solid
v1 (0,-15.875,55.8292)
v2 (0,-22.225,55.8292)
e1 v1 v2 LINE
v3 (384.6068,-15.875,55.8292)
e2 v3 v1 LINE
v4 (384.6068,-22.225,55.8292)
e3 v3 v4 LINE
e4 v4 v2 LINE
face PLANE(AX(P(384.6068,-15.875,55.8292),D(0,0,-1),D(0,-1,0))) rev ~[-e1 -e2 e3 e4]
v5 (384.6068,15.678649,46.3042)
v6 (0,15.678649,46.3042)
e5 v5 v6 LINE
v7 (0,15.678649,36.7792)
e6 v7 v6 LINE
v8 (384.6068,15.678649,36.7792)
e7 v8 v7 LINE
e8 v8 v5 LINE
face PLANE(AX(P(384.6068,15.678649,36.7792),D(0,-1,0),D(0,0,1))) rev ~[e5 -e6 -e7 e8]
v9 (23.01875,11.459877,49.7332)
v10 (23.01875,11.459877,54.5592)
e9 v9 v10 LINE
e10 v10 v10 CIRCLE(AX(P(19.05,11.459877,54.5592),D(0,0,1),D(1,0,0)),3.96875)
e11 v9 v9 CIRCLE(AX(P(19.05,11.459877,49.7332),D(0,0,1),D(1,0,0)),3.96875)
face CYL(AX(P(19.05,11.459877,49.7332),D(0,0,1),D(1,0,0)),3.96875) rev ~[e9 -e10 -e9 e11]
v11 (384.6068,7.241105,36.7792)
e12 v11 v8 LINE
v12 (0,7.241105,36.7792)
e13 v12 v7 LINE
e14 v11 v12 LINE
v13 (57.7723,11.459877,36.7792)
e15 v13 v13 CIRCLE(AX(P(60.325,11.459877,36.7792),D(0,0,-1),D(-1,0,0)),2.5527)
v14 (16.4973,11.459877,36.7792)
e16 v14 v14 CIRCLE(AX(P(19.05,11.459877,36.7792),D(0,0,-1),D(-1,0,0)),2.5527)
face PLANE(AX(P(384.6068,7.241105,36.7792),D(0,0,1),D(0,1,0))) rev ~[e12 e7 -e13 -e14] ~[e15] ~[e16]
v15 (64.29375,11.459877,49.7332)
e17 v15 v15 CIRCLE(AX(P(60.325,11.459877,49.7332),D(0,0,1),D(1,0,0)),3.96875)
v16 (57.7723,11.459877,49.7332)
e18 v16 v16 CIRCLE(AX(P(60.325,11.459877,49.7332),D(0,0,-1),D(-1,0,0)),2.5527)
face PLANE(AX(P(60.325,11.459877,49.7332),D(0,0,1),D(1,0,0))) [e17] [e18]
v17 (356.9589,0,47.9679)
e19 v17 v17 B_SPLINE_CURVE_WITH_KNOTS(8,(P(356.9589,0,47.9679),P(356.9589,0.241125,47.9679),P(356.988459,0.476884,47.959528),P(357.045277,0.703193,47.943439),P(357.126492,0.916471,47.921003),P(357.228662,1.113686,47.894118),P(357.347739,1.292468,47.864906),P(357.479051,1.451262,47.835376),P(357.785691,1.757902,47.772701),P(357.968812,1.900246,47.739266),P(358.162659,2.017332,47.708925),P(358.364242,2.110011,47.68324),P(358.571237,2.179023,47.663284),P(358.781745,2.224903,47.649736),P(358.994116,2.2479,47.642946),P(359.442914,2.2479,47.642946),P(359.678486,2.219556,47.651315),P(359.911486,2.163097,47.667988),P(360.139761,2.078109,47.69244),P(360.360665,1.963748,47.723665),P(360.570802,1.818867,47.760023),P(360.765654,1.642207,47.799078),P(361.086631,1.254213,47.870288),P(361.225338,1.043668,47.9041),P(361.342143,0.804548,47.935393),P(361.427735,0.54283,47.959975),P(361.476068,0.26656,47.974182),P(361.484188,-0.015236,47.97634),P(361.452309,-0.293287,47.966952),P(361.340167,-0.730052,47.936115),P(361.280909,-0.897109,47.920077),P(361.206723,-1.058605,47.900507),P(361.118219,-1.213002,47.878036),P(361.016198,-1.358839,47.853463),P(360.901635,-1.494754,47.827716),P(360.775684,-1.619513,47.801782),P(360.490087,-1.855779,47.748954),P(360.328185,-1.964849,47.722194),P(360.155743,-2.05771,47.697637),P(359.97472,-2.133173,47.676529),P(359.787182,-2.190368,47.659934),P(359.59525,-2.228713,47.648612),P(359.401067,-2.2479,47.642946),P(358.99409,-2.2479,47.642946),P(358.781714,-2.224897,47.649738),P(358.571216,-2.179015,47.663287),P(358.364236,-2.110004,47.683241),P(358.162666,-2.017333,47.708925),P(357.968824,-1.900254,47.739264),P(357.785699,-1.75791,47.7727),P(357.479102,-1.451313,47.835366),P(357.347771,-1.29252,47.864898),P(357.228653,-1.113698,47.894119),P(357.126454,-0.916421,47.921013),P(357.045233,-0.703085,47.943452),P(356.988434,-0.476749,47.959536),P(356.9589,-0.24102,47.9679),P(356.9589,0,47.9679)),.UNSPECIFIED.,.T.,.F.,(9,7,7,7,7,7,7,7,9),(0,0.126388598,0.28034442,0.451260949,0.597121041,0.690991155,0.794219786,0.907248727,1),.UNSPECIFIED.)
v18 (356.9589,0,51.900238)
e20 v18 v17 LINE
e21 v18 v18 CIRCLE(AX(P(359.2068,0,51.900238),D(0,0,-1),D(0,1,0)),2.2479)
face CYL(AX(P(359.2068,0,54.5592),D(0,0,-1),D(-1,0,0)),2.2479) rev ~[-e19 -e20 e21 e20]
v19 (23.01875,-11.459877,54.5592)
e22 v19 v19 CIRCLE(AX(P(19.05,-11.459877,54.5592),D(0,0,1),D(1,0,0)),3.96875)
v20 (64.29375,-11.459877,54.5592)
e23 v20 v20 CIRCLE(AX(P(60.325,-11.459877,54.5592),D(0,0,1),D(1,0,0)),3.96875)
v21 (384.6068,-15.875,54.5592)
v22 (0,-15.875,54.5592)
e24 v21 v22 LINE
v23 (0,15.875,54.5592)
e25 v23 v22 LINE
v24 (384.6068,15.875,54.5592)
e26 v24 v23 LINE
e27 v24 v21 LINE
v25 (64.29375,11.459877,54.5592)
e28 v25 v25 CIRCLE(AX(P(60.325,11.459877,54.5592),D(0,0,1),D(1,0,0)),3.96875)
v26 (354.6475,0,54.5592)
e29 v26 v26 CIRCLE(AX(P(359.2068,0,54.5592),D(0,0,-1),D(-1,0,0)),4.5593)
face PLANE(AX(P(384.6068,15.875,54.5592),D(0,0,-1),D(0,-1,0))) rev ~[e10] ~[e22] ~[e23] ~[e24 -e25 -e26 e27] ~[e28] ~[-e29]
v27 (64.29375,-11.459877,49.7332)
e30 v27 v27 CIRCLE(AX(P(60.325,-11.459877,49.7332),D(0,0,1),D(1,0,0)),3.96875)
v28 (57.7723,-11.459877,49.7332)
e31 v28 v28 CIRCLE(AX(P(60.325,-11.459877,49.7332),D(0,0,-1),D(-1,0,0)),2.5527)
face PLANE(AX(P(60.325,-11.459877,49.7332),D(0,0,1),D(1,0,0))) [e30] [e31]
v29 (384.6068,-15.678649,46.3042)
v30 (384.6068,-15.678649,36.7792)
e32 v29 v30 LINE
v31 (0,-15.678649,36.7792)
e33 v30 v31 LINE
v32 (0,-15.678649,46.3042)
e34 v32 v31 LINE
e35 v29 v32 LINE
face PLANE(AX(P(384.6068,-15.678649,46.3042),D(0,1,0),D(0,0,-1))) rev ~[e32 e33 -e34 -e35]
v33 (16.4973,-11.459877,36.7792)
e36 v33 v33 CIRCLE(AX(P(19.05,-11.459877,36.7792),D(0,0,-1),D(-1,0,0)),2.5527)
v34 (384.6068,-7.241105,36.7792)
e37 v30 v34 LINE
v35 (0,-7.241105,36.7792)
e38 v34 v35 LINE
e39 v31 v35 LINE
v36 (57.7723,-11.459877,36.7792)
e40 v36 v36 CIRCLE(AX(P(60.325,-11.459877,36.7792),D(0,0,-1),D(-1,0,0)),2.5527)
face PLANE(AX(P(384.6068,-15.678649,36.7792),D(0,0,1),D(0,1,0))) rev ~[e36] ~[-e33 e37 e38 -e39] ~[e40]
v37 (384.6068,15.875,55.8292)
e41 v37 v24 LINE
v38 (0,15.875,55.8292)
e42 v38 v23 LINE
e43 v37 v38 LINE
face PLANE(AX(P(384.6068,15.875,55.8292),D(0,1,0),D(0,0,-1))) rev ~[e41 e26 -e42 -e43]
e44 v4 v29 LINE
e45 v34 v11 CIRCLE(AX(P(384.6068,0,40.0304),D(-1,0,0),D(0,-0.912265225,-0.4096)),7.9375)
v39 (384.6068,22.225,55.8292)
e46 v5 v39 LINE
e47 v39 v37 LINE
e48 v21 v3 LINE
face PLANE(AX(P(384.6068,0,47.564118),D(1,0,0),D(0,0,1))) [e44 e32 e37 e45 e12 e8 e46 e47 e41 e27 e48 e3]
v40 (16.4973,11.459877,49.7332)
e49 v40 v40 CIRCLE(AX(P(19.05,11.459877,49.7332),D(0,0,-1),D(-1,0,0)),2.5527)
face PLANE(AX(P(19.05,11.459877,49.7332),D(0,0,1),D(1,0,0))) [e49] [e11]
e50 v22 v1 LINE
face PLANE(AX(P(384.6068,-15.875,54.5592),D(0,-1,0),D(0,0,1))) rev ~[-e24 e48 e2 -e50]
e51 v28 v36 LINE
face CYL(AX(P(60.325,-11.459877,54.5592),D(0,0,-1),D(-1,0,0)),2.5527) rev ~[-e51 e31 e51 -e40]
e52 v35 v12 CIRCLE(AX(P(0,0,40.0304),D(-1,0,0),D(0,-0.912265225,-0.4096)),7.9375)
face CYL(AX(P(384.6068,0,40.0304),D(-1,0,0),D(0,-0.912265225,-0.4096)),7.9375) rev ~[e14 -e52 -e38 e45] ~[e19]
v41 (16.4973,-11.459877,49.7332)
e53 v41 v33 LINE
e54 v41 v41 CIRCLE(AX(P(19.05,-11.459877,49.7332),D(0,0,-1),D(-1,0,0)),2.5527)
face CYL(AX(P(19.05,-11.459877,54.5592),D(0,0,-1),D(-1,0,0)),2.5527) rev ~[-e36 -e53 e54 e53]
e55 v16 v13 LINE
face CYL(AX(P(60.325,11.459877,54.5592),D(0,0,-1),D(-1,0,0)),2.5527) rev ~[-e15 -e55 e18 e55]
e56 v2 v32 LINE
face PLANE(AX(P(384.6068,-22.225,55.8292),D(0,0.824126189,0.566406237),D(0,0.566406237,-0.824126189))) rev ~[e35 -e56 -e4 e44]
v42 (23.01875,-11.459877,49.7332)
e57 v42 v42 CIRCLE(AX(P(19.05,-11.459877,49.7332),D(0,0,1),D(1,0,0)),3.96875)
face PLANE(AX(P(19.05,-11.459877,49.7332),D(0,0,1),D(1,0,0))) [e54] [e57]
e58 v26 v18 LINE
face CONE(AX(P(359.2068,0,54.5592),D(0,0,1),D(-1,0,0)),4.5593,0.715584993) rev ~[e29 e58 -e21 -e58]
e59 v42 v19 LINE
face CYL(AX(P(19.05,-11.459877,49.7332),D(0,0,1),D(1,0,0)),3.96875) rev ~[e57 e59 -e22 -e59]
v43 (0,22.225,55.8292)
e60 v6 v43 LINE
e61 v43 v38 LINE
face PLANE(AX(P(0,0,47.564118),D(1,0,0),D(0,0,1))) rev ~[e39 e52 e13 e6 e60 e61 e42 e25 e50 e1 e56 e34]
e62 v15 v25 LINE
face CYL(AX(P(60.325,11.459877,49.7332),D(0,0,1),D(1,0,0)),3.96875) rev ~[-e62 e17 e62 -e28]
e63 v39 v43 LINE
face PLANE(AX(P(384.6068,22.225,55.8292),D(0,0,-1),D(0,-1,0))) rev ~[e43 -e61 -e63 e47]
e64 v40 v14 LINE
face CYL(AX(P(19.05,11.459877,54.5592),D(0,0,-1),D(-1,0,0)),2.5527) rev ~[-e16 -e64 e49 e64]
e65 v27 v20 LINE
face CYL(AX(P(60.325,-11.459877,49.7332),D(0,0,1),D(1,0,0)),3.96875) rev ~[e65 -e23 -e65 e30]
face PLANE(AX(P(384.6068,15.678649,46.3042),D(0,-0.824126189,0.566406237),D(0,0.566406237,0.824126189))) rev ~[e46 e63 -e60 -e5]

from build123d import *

# Parameters (mm, degrees)
F5_D           = 4.4958
F5_START       = 1.27
F5_CSINK_D     = 9.1186
F5_CSINK_ANGLE = 82
F9_D           = 5.1054
F9_CBORE_D     = 7.9375
F9_CBORE_DEPTH = 4.826


# Not quite as in the source:
# - a feature names something its author has since deleted; it is built from what else it names


with BuildPart() as f2:
    # F2: sweep along a path in F0
    with BuildLine(Plane.XZ) as f2_path:
        Line((384.6068, 55.8292), (0, 55.8292))
    # F1 (on Right) → F2 (sweep)
    with BuildSketch(Plane.YZ):
        with BuildLine():
            Line((15.875, 54.5592), (0, 54.5592))
            Line((0, 54.5592), (-15.875, 54.5592))
            Line((-15.875, 54.5592), (-15.875, 55.8292))
            Line((-15.875, 55.8292), (-22.225, 55.8292))
            Line((-22.225, 55.8292), (-15.6786488693, 46.3042))
            Line((-15.6786488693, 46.3042), (-15.6786488693, 36.7792))
            Line((-15.6786488693, 36.7792), (-7.2411052202, 36.7792))
            ThreePointArc((-7.2411052202, 36.7792), (0, 47.9679), (7.2411052202, 36.7792))
            Line((7.2411052202, 36.7792), (15.6786488693, 36.7792))
            Line((15.6786488693, 36.7792), (15.6786488693, 46.3042))
            Line((15.6786488693, 46.3042), (22.225, 55.8292))
            Line((22.225, 55.8292), (15.875, 55.8292))
            Line((15.875, 55.8292), (15.875, 54.5592))
        make_face()
    sweep(path=f2_path.line)

    # F5 (through all)
    # its depths count from where the whole tool has entered the part; down to there all is cleared
    with Locations(Plane.XY.offset(55.8292).offset(-F5_START)):
        with Locations((359.2068, 0)):
            CounterSinkHole(F5_D / 2, F5_CSINK_D / 2, counter_sink_angle=F5_CSINK_ANGLE)

    # F9 (through all)
    with Locations(Plane.XY.offset(54.5592)):
        with Locations((60.325, 11.4598770448), (60.325, -11.4598770448), (19.05, -11.4598770448), (19.05, 11.4598770448)):
            CounterBoreHole(F9_D / 2, F9_CBORE_D / 2, F9_CBORE_DEPTH)


solid = f2.part
